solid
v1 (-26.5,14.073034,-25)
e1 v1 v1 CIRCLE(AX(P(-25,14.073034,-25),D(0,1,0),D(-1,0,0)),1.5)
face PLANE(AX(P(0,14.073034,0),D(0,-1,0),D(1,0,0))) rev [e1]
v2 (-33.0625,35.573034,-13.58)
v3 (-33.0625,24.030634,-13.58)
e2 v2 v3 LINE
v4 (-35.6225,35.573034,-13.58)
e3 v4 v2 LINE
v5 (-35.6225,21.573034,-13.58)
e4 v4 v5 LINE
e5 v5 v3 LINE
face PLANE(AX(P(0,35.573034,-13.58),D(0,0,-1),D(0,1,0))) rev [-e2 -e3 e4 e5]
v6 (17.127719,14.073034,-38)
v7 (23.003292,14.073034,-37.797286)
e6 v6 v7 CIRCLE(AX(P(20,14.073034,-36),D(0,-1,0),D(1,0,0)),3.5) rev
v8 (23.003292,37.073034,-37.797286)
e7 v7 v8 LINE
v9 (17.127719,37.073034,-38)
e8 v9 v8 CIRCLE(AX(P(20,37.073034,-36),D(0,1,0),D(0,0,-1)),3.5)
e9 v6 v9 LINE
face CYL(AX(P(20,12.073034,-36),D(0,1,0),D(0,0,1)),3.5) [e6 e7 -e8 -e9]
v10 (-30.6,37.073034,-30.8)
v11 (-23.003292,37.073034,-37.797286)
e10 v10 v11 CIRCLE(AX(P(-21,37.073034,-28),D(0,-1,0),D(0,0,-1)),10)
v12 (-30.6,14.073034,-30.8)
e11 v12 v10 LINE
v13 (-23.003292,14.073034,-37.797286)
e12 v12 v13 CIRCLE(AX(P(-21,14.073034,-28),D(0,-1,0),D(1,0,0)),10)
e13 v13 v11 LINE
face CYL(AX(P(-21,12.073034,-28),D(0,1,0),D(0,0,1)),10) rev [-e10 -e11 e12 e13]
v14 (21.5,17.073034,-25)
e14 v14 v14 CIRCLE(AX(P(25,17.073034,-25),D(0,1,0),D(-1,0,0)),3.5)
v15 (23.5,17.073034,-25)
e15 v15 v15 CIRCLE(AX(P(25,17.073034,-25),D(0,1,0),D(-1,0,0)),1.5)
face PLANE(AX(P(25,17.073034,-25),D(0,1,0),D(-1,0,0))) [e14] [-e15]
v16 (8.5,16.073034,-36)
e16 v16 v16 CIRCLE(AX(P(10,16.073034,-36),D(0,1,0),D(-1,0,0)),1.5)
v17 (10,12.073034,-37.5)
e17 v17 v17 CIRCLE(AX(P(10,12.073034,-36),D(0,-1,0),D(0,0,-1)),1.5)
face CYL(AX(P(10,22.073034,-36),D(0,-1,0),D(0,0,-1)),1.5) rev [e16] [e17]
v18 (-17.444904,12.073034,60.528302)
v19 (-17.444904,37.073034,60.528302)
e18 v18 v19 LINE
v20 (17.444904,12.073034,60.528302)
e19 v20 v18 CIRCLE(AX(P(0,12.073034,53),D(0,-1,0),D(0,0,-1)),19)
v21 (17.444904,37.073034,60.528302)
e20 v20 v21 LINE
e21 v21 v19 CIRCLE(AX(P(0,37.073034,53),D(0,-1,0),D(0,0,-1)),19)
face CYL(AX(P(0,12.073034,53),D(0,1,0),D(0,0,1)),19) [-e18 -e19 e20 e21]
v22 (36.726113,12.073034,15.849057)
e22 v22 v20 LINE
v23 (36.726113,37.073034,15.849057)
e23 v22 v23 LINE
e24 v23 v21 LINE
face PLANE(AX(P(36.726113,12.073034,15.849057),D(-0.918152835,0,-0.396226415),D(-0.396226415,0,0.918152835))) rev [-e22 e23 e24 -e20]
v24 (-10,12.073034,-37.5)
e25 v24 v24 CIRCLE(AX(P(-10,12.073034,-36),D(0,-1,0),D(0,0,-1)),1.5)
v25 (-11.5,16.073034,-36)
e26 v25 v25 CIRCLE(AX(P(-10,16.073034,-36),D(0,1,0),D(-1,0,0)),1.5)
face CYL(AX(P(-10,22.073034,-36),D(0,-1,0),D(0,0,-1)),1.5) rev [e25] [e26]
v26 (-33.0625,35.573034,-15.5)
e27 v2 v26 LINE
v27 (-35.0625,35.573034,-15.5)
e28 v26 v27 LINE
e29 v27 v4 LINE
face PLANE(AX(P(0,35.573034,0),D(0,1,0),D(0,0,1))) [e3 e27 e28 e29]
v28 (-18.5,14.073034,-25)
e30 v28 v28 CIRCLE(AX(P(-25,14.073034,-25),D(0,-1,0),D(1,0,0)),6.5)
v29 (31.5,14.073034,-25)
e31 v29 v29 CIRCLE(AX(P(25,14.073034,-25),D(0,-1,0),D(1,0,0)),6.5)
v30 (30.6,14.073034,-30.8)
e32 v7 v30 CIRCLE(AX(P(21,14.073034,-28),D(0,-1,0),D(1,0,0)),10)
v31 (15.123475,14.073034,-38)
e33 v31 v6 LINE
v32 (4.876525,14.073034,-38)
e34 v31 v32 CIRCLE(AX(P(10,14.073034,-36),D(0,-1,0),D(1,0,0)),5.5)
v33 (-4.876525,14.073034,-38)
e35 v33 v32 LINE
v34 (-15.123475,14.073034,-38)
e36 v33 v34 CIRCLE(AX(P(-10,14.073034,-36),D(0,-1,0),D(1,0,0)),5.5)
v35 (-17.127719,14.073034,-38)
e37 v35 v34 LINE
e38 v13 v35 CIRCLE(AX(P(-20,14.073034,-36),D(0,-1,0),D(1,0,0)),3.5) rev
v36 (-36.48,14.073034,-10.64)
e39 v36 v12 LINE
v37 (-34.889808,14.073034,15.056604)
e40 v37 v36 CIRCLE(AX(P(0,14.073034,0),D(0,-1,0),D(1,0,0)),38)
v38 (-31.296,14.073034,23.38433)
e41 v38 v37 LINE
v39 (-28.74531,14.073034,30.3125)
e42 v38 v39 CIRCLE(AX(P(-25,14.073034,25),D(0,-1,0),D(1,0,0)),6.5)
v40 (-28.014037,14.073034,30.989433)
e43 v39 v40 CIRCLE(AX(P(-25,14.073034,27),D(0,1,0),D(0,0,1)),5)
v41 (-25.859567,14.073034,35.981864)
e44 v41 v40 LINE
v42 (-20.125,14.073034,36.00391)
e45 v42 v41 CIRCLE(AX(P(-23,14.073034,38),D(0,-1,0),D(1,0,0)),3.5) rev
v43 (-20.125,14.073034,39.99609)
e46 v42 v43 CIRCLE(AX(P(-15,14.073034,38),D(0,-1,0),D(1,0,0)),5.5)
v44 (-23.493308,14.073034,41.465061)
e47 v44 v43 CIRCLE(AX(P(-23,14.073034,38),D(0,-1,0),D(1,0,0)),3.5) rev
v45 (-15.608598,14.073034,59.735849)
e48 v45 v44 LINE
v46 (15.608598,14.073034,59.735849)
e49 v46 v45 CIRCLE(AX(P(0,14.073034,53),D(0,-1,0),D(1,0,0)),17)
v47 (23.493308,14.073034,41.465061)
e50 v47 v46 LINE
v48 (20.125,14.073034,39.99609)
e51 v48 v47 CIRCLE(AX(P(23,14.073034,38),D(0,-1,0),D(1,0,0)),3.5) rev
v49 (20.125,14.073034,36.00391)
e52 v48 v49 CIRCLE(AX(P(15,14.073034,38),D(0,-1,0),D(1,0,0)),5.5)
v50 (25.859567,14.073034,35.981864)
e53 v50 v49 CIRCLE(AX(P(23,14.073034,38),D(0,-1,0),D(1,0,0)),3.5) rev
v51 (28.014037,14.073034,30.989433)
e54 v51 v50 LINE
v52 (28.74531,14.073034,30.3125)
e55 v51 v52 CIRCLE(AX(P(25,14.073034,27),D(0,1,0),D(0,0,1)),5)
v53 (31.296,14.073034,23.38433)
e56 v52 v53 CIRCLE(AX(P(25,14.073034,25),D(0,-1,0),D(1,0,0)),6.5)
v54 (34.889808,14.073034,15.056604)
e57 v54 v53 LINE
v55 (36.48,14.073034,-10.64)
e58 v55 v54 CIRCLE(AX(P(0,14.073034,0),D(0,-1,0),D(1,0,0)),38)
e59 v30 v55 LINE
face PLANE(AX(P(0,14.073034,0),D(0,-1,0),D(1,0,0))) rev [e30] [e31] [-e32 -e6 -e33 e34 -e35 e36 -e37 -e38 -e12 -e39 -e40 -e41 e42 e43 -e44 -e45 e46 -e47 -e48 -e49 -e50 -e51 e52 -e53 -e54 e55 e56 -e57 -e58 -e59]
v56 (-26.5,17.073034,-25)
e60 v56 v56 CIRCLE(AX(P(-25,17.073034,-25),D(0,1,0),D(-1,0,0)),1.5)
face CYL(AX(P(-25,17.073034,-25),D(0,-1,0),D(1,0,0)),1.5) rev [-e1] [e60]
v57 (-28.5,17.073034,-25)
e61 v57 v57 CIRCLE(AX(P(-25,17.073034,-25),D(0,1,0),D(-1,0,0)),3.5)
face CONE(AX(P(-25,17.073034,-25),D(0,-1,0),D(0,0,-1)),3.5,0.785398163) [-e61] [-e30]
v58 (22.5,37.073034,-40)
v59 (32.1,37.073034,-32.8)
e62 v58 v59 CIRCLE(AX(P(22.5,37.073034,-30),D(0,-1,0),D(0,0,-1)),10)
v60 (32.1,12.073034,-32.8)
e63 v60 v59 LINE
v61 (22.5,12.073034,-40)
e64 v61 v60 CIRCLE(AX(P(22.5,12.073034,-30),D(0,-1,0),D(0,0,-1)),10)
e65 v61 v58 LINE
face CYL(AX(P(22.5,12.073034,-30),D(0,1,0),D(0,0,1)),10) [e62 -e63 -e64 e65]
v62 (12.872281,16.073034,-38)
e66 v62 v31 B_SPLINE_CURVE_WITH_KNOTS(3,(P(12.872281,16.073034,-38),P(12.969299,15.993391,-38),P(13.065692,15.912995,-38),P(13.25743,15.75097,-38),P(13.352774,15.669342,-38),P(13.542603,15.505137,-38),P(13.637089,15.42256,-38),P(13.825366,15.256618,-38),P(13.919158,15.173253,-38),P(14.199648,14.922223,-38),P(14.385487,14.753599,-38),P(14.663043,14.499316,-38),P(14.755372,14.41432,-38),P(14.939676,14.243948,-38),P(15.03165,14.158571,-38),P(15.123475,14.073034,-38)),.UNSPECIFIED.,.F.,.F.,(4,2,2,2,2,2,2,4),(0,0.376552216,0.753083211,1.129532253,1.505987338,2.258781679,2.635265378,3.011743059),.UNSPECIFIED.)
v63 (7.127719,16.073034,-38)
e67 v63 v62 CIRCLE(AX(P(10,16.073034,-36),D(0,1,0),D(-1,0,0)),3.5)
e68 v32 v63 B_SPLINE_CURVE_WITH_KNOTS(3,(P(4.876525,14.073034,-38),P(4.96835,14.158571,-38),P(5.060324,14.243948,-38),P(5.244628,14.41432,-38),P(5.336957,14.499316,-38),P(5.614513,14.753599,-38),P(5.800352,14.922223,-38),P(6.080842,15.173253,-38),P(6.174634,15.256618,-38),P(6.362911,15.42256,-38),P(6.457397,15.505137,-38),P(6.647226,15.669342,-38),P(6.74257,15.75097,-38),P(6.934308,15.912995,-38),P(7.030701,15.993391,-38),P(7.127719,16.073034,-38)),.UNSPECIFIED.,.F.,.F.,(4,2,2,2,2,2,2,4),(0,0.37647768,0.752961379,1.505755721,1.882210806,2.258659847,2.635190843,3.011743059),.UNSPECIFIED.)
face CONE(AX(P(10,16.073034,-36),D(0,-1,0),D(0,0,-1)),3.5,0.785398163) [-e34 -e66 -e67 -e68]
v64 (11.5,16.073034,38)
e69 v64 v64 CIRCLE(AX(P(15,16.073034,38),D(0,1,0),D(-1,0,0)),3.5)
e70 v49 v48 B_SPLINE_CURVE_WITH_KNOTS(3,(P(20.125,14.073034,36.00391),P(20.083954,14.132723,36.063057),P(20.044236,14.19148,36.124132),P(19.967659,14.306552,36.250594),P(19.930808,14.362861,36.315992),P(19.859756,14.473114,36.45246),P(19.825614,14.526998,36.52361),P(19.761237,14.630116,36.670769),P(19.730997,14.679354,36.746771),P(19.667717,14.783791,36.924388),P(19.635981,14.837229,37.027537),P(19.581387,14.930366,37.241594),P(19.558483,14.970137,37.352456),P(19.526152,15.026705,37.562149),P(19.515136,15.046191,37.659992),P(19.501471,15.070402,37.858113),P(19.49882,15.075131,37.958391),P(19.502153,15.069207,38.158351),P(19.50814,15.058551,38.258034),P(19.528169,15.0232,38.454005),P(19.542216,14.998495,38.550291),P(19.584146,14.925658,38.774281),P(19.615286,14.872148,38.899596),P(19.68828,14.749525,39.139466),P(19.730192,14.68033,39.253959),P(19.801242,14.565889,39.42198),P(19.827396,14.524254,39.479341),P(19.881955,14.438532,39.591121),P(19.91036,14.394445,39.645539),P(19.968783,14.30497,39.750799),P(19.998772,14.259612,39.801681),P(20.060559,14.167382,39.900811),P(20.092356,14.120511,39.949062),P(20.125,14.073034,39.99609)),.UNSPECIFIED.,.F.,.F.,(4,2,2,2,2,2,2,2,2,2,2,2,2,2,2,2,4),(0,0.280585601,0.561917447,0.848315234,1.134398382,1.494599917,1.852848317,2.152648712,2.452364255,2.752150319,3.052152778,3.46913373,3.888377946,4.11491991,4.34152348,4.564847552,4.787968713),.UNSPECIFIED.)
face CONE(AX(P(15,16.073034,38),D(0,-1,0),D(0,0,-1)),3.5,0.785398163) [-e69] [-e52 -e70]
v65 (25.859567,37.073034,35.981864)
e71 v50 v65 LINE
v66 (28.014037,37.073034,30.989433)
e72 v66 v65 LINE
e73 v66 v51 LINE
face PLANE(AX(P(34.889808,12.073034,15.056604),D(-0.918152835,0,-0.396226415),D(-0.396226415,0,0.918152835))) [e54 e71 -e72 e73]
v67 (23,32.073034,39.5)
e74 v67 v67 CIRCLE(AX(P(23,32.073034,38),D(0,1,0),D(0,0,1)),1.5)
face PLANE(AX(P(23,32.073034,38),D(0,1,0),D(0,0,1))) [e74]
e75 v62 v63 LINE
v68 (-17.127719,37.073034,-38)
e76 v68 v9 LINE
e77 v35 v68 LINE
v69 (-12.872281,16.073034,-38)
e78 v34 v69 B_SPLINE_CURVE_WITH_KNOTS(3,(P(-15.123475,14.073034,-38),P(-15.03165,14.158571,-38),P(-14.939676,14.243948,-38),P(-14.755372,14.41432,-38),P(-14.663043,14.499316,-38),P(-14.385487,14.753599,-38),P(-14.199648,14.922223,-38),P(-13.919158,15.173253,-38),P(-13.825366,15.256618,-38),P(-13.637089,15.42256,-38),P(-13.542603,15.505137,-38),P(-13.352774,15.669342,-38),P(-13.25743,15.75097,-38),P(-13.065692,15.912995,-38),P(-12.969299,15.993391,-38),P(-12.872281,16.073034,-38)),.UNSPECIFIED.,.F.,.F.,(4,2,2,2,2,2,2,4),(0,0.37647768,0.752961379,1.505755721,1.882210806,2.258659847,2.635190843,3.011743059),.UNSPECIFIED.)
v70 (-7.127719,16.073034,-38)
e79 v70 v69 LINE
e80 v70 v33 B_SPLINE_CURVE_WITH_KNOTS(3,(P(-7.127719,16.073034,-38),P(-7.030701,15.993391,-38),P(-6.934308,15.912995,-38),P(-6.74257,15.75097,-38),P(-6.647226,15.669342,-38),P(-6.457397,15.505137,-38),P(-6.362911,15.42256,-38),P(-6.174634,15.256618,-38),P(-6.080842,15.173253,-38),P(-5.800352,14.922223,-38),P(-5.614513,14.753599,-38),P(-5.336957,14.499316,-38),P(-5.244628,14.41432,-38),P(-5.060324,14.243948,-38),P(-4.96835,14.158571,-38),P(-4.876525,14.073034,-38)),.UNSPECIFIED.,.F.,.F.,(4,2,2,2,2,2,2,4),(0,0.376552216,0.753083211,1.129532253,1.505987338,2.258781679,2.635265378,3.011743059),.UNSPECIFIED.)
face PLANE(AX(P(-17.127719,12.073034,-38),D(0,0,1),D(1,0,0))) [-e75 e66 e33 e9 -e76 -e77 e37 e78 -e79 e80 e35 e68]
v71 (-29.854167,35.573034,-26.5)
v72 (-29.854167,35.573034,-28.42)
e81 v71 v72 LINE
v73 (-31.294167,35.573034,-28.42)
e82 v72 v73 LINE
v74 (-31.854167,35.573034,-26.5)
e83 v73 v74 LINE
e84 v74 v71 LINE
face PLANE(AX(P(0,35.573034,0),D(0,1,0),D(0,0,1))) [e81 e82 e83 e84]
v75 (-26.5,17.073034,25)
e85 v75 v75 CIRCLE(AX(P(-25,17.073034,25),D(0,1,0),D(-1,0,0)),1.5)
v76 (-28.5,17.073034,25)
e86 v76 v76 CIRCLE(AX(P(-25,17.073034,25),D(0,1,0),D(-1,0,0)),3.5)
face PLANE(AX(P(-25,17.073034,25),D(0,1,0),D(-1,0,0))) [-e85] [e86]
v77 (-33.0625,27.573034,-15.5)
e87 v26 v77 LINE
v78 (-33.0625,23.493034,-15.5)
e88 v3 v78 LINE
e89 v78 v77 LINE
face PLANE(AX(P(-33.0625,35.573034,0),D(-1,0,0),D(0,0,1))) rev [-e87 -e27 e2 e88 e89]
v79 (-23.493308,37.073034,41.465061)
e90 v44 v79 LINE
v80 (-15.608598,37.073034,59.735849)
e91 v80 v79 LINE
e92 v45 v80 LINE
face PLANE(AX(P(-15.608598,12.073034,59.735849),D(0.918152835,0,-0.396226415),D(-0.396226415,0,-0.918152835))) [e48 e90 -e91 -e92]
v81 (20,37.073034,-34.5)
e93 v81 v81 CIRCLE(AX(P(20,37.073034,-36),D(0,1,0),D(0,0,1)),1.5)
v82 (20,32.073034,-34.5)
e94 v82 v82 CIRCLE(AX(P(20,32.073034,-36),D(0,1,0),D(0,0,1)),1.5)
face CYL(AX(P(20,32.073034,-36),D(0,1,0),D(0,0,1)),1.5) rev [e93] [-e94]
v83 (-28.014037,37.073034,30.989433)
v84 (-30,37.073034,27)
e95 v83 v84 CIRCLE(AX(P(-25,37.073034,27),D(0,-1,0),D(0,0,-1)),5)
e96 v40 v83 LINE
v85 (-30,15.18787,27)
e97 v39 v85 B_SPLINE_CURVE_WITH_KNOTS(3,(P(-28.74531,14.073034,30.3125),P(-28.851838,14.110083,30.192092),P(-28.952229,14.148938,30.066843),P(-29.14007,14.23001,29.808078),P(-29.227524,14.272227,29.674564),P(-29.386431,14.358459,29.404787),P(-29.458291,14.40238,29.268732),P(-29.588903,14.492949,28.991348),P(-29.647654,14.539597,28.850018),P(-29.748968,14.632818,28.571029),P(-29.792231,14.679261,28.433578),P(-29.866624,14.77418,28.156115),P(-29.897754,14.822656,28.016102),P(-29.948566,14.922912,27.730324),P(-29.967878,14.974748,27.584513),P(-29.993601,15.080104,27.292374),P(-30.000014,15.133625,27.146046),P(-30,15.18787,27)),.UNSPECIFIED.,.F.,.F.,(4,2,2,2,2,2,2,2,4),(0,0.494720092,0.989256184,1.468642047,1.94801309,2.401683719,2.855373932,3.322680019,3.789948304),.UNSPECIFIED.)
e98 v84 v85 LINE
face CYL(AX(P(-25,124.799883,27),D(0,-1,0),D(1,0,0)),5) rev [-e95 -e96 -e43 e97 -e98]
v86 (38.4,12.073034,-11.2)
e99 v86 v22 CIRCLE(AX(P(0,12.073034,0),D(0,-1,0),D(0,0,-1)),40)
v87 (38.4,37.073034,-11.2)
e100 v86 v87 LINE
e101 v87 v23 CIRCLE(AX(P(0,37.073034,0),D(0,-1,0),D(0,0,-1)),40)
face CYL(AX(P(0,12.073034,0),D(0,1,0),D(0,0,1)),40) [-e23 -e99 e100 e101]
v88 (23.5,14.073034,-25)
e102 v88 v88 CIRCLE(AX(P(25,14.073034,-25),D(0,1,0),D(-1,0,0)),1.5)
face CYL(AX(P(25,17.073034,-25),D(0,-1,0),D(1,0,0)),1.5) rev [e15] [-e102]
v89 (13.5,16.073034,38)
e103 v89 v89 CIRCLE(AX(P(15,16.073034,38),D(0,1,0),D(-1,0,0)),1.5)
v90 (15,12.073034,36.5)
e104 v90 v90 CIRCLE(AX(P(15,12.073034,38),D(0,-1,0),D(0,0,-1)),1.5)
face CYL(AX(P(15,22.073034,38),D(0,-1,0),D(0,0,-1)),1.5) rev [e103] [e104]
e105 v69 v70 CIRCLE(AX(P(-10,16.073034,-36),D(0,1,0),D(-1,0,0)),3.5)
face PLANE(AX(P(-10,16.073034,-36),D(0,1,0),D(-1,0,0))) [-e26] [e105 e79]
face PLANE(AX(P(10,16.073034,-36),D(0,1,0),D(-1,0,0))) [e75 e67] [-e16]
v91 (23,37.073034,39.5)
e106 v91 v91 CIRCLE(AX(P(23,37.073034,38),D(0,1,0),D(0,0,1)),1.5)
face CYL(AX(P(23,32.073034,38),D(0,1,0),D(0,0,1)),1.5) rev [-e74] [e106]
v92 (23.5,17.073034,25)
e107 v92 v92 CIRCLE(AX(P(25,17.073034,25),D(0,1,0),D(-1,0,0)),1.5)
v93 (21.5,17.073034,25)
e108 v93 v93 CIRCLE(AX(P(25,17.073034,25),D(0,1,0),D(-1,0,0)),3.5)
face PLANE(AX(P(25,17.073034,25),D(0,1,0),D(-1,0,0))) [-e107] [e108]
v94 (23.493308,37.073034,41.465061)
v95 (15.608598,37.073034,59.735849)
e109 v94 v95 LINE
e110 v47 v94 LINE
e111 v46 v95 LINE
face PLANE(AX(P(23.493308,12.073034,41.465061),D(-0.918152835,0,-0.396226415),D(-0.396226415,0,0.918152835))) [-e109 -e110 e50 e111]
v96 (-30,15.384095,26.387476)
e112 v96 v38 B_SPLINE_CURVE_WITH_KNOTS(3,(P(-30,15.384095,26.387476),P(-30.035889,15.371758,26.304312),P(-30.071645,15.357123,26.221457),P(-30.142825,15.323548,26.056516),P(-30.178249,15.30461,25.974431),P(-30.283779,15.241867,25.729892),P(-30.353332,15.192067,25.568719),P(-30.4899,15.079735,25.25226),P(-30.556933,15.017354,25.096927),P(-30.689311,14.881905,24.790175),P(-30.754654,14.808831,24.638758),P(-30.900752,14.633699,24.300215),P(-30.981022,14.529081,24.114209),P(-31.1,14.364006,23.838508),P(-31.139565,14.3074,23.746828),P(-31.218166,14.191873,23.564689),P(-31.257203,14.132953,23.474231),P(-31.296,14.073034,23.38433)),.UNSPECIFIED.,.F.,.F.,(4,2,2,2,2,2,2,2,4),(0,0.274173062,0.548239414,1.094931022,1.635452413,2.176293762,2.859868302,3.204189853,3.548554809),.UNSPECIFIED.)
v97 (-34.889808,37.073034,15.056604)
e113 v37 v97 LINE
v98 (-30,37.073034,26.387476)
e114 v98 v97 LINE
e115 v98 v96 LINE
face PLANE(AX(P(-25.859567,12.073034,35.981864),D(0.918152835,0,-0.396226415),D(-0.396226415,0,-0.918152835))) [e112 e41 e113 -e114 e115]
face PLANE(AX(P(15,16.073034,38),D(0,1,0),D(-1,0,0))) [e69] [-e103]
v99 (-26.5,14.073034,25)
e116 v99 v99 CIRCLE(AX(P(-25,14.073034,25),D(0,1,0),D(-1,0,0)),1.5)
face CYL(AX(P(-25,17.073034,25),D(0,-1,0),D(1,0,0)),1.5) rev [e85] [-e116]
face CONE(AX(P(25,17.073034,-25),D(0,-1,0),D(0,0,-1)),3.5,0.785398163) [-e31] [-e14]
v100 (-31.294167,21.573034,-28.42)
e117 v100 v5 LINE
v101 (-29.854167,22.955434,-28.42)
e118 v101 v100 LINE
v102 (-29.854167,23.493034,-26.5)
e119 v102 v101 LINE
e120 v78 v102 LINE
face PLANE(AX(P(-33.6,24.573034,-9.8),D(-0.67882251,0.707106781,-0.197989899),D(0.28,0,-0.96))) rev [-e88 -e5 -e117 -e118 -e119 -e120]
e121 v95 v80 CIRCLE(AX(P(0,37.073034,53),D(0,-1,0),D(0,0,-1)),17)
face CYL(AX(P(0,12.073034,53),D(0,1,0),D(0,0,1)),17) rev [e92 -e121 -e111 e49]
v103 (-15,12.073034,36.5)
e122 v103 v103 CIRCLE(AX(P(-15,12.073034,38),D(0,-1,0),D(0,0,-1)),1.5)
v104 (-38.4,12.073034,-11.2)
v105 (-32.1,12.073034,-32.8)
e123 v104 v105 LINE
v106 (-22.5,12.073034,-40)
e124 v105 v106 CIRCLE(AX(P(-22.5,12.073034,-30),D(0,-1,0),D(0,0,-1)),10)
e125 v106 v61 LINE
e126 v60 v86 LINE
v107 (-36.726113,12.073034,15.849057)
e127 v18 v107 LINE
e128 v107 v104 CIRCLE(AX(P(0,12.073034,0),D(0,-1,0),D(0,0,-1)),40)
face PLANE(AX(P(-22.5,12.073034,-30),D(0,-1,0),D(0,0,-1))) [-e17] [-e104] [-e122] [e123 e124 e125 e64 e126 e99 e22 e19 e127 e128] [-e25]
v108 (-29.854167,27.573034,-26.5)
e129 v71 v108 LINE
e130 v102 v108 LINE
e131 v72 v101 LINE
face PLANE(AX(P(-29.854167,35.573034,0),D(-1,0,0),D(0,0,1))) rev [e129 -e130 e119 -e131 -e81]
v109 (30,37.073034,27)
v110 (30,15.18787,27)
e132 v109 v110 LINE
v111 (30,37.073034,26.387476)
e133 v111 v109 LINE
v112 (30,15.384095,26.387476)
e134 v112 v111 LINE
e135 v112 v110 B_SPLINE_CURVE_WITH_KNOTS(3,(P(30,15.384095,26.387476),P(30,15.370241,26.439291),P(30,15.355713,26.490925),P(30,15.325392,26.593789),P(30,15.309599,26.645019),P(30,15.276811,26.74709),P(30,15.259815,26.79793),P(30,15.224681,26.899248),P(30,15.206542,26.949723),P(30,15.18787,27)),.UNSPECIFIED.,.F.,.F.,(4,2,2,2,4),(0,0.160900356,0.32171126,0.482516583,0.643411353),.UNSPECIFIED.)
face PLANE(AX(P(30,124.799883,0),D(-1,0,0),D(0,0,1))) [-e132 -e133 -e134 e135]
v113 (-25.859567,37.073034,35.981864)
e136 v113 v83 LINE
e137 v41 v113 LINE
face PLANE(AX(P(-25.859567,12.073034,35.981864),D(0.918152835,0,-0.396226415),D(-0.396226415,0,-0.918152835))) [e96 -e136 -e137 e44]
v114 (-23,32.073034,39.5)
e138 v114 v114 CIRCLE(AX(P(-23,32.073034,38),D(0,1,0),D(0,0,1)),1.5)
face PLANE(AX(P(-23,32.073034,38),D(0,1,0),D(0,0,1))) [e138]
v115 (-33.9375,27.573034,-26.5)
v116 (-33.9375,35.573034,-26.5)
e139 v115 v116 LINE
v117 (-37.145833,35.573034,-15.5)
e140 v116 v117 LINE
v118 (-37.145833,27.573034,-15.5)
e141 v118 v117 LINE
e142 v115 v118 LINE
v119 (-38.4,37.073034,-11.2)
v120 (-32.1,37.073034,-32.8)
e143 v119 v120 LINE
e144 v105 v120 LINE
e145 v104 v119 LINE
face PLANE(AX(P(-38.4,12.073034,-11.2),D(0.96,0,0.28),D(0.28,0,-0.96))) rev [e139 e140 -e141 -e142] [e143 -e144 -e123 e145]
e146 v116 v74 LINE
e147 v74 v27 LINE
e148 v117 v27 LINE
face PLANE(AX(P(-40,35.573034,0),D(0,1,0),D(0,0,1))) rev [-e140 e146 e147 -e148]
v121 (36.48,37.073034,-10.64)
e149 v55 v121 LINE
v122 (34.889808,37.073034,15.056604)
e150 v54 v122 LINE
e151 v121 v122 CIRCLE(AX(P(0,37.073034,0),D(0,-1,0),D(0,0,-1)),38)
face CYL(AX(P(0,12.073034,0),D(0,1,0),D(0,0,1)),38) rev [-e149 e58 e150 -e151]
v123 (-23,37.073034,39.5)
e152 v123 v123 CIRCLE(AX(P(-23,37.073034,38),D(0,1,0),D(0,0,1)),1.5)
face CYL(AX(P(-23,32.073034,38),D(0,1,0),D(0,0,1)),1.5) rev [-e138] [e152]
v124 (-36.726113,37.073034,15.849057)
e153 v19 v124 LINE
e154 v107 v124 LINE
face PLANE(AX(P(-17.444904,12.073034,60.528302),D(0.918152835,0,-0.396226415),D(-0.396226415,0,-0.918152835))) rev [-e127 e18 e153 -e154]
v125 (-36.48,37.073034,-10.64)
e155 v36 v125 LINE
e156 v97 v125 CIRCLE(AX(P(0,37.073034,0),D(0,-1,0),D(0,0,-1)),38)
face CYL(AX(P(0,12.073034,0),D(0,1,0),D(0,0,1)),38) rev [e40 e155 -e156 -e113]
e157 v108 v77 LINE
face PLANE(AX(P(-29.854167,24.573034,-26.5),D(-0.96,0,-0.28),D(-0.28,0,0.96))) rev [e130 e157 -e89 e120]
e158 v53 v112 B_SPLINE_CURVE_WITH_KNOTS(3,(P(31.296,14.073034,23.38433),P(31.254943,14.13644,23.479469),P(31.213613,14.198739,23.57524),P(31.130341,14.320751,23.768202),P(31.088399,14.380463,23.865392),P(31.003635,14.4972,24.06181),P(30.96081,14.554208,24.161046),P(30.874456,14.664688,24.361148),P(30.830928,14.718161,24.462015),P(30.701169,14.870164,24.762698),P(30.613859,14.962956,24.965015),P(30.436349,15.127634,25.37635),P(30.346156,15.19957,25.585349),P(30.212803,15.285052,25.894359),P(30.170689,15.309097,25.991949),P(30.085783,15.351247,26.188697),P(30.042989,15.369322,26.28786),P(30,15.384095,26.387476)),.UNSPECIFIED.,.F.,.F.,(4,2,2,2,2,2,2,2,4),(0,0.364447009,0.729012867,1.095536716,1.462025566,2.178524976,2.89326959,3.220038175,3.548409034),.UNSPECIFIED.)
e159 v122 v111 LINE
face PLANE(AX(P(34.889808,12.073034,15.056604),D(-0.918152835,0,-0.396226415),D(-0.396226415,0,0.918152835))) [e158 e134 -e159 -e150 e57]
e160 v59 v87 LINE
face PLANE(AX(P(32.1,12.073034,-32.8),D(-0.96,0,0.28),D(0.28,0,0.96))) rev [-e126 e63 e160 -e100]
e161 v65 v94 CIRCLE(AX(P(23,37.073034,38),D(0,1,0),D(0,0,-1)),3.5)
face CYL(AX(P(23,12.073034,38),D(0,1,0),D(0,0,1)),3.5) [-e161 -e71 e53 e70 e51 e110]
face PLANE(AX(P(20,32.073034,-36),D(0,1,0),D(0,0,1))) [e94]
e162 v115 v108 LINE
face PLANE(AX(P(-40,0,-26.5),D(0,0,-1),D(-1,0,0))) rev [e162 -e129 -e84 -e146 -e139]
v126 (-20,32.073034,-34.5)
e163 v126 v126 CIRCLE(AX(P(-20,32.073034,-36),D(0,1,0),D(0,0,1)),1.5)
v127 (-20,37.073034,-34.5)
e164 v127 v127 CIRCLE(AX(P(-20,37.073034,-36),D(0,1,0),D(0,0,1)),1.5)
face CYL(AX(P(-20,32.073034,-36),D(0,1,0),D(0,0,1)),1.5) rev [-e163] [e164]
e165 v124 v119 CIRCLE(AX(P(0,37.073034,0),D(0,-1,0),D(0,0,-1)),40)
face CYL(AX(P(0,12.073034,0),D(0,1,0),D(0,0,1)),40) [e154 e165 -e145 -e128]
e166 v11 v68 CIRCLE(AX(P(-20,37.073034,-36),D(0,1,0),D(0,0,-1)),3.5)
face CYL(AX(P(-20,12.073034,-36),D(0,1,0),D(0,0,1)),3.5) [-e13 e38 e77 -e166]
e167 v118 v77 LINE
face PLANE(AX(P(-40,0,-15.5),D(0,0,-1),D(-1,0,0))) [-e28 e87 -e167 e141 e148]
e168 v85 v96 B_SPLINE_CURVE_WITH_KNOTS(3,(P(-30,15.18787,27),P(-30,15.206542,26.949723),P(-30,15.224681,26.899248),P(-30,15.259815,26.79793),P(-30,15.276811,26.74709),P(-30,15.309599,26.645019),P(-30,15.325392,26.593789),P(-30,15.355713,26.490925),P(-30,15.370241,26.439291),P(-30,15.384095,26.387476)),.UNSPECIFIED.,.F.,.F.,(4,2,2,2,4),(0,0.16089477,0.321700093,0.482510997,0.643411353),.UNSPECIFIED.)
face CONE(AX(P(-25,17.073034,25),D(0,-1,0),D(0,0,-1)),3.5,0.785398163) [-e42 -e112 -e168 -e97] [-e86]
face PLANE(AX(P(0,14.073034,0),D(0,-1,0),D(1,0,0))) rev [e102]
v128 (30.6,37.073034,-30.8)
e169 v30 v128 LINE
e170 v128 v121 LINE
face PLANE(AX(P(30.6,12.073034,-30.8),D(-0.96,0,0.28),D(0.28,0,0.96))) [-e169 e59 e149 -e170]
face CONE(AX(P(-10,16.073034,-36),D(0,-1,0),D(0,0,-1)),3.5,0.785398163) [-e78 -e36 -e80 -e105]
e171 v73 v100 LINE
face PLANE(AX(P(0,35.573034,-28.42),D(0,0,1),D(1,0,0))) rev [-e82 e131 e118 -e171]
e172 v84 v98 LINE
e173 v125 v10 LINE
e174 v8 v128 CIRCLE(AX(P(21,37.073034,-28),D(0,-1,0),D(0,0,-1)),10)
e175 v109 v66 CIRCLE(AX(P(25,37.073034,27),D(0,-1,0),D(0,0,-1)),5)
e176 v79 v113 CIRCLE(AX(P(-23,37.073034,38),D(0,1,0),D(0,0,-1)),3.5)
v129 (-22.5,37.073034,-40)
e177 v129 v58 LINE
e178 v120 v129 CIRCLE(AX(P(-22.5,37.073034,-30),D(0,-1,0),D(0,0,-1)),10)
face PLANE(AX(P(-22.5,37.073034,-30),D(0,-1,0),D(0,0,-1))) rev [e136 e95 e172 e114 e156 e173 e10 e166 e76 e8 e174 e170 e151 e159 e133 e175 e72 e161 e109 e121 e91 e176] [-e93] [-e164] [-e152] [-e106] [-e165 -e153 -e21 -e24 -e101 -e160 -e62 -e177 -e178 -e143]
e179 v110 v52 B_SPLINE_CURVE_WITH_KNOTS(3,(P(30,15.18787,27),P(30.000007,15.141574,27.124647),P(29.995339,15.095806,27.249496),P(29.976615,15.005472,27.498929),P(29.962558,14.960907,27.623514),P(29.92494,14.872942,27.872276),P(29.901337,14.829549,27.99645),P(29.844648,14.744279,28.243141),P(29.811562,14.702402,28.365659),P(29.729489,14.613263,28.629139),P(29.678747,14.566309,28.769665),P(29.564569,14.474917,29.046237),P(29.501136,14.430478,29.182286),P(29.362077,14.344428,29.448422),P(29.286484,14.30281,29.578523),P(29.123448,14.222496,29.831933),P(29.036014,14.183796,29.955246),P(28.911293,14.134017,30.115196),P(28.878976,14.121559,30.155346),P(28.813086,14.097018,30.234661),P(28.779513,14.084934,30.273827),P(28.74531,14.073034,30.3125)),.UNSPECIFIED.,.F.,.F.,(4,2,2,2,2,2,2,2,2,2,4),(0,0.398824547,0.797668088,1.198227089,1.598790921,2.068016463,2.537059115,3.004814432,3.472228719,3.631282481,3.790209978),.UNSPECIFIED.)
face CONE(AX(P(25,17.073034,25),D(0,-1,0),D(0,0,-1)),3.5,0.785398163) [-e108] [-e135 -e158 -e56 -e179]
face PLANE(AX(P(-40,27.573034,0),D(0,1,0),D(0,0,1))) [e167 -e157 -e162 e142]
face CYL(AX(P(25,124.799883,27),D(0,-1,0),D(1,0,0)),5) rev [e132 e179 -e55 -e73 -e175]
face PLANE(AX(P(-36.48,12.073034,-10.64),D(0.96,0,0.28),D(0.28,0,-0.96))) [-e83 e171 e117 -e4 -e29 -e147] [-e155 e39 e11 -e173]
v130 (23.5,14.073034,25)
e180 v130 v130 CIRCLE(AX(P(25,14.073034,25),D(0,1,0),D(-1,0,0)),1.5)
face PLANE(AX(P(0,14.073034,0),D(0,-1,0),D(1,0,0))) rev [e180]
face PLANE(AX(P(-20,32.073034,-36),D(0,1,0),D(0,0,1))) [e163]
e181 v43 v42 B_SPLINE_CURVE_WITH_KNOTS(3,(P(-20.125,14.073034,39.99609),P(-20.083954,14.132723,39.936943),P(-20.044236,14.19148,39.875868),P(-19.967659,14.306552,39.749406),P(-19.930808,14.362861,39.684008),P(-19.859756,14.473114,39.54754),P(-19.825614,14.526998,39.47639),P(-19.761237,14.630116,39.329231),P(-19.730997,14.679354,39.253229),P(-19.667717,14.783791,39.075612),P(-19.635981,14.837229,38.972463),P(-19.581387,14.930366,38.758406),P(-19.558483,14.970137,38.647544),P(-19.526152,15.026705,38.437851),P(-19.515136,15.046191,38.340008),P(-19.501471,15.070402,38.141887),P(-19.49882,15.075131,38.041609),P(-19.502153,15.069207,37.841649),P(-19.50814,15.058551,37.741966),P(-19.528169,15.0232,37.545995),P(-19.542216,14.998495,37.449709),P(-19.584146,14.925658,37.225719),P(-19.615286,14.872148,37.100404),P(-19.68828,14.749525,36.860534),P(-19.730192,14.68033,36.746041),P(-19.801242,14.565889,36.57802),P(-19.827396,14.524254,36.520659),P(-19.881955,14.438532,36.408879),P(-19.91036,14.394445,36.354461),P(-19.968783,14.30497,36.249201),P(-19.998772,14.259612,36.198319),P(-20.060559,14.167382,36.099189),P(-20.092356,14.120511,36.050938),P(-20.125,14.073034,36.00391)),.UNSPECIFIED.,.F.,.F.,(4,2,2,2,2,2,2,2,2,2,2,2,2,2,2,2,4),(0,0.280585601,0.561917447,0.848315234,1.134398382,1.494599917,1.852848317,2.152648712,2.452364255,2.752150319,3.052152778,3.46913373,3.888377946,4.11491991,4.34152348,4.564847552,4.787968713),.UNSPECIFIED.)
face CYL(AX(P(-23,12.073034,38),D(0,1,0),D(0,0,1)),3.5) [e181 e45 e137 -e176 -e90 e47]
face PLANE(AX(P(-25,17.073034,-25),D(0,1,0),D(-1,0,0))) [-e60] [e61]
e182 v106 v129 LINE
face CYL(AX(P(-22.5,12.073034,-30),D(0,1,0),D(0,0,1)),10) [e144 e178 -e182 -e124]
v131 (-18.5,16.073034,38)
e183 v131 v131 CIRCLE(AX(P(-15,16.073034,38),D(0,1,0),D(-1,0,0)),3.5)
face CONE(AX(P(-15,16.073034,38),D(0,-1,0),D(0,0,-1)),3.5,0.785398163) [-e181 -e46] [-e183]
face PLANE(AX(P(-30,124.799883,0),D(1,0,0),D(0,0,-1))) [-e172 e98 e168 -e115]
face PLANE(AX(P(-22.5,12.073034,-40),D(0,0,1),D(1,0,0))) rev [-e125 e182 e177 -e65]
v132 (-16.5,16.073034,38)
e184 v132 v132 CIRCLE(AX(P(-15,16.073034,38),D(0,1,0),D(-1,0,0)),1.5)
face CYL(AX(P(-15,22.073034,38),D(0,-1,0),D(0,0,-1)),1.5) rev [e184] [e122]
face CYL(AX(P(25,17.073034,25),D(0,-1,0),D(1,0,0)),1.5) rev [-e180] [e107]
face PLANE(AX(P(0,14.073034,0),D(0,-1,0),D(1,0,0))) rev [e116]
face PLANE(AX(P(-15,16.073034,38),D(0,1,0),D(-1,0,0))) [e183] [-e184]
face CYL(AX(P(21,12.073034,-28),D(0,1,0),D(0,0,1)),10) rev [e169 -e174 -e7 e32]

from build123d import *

# Parameters (mm, degrees)
BOSS_EXTRUDE1_DEPTH = 25
BOSS_EXTRUDE2_START = -2
BOSS_EXTRUDE2_DEPTH = 2
SKETCH3_R           = 3.5
SKETCH3_R_2         = 1.5
BOSS_EXTRUDE3_DEPTH = 3
SKETCH4_R           = 3.5
CUT_EXTRUDE1_DEPTH  = 23
SKETCH6_R           = 1.5
CUT_EXTRUDE3_DEPTH  = 5
SKETCH7_W           = 11
SKETCH7_H           = 8
SKETCH7_W_2         = 8
SKETCH7_H_2         = 5
CUT_EXTRUDE4_DEPTH  = 91.323916408
BOSS_EXTRUDE5_DEPTH = 8
BOSS_EXTRUDE6_DEPTH = 3
CHAMFER1_SIZE       = 3
SKETCH11_R          = 1.5
CUT_EXTRUDE5_DEPTH  = 10
SKETCH12_R          = 3.5
SKETCH12_R_2        = 1.5
BOSS_EXTRUDE7_DEPTH = 2
CHAMFER2_SIZE       = 2
CHAMFER3_SIZE       = 3


with BuildPart() as part:
    # Sketch1 → Boss-Extrude1 (new body)
    with BuildSketch(Plane.XZ.offset(-37.073034342)):
        with BuildLine():
            Line((-22.5, -40), (22.5, -40))
            ThreePointArc((22.5, -40), (28.5, -38), (32.1, -32.8))
            Line((32.1, -32.8), (38.4, -11.2))
            ThreePointArc((38.4, -11.2), (39.923628268, 2.470608411), (36.72611339, 15.849056604))
            Line((36.72611339, 15.849056604), (17.44490386, 60.528301887))
            ThreePointArc((17.44490386, 60.528301887), (0, 72), (-17.44490386, 60.528301887))
            Line((-17.44490386, 60.528301887), (-36.72611339, 15.849056604))
            ThreePointArc((-36.72611339, 15.849056604), (-39.923628268, 2.470608411), (-38.4, -11.2))
            Line((-38.4, -11.2), (-32.1, -32.8))
            ThreePointArc((-32.1, -32.8), (-28.5, -38), (-22.5, -40))
        make_face()
        with BuildLine():
            Line((-17.127718677, -38), (17.127718677, -38))
            ThreePointArc((17.127718677, -38), (19.879318075, -32.502081208), (23.003291752, -37.797286469))
            ThreePointArc((23.003291752, -37.797286469), (27.774924306, -35.355297455), (30.6, -30.8))
            Line((30.6, -30.8), (36.48, -10.64))
            ThreePointArc((36.48, -10.64), (37.927446855, 2.347077991), (34.889807721, 15.056603774))
            Line((34.889807721, 15.056603774), (25.859567427, 35.981863698))
            ThreePointArc((25.859567427, 35.981863698), (19.786465078, 36.613207547), (23.493308255, 41.465060889))
            Line((23.493308255, 41.465060889), (15.608598191, 59.735849057))
            ThreePointArc((15.608598191, 59.735849057), (0, 70), (-15.608598191, 59.735849057))
            Line((-15.608598191, 59.735849057), (-23.493308255, 41.465060889))
            ThreePointArc((-23.493308255, 41.465060889), (-19.786465078, 36.613207547), (-25.859567427, 35.981863698))
            Line((-25.859567427, 35.981863698), (-34.889807721, 15.056603774))
            ThreePointArc((-34.889807721, 15.056603774), (-37.927446855, 2.347077991), (-36.48, -10.64))
            Line((-36.48, -10.64), (-30.6, -30.8))
            ThreePointArc((-30.6, -30.8), (-27.774924306, -35.355297455), (-23.003291752, -37.797286469))
            ThreePointArc((-23.003291752, -37.797286469), (-19.879318075, -32.502081208), (-17.127718677, -38))
        make_face(mode=Mode.SUBTRACT)
    extrude(amount=BOSS_EXTRUDE1_DEPTH)

    # Sketch2 → Boss-Extrude2 (add)
    with BuildSketch(Plane.XZ.offset(-12.073034342).offset(BOSS_EXTRUDE2_START)):
        with BuildLine():
            Line((-38.4, -11.2), (-32.1, -32.8))
            ThreePointArc((-32.1, -32.8), (-28.5, -38), (-22.5, -40))
            Line((-22.5, -40), (22.5, -40))
            ThreePointArc((22.5, -40), (28.5, -38), (32.1, -32.8))
            Line((32.1, -32.8), (38.4, -11.2))
            ThreePointArc((38.4, -11.2), (39.923628268, 2.470608411), (36.72611339, 15.849056604))
            Line((36.72611339, 15.849056604), (17.44490386, 60.528301887))
            ThreePointArc((17.44490386, 60.528301887), (0, 72), (-17.44490386, 60.528301887))
            Line((-17.44490386, 60.528301887), (-36.72611339, 15.849056604))
            ThreePointArc((-36.72611339, 15.849056604), (-39.923628268, 2.470608411), (-38.4, -11.2))
        make_face()
    extrude(amount=BOSS_EXTRUDE2_DEPTH)

    # Sketch3 → Boss-Extrude3 (add)
    # profile 1 of 4: a face of its own
    with BuildSketch(Plane(origin=(0, 14.073034342, 0), x_dir=(1, 0, 0), z_dir=(0, 1, 0))):
        with Locations((25, -25)):
            Circle(SKETCH3_R)
        with Locations(Location((25, -25, 0), (0, 0, 180))):
            Circle(SKETCH3_R_2, mode=Mode.SUBTRACT)
    # profile 2 of 4: a face of its own
    with BuildSketch(Plane(origin=(0, 14.073034342, 0), x_dir=(1, 0, 0), z_dir=(0, 1, 0))):
        with Locations((25, 25)):
            Circle(SKETCH3_R)
        with Locations(Location((25, 25, 0), (0, 0, 180))):
            Circle(SKETCH3_R_2, mode=Mode.SUBTRACT)
    # profile 3 of 4: a face of its own
    with BuildSketch(Plane(origin=(0, 14.073034342, 0), x_dir=(1, 0, 0), z_dir=(0, 1, 0))):
        with Locations((-25, 25)):
            Circle(SKETCH3_R)
        with Locations(Location((-25, 25, 0), (0, 0, 180))):
            Circle(SKETCH3_R_2, mode=Mode.SUBTRACT)
    # profile 4 of 4: a face of its own
    with BuildSketch(Plane(origin=(0, 14.073034342, 0), x_dir=(1, 0, 0), z_dir=(0, 1, 0))):
        with Locations((-25, -25)):
            Circle(SKETCH3_R)
        with Locations(Location((-25, -25, 0), (0, 0, 180))):
            Circle(SKETCH3_R_2, mode=Mode.SUBTRACT)
    extrude(amount=BOSS_EXTRUDE3_DEPTH)

    # Sketch4 → Cut-Extrude1 (cut)
    # profile 1 of 2: a face of its own
    with BuildSketch(Plane(origin=(0, 14.073034342, 0), x_dir=(1, 0, 0), z_dir=(0, 1, 0))):
        with BuildLine():
            Line((30, -26.387475844), (28.014037499, -30.989433288))
            ThreePointArc((28.014037499, -30.989433288), (29.476057836, -29.228206959), (30, -27))
            Line((30, -27), (30, -26.387475844))
        make_face()
    # profile 2 of 2: a face of its own
    with BuildSketch(Plane(origin=(0, 14.073034342, 0), x_dir=(1, 0, 0), z_dir=(0, 1, 0))):
        with BuildLine():
            ThreePointArc((-30, -27), (-28.535533906, -30.535533906), (-25, -32))
            Line((-25, -32), (25, -32))
            ThreePointArc((25, -32), (26.589470598, -31.740631099), (28.014037499, -30.989433288))
            Line((28.014037499, -30.989433288), (30, -26.387475844))
            Line((30, -26.387475844), (30, 27))
            ThreePointArc((30, 27), (28.535533906, 30.535533906), (25, 32))
            Line((25, 32), (-25, 32))
            ThreePointArc((-25, 32), (-28.535533906, 30.535533906), (-30, 27))
            Line((-30, 27), (-30, -27))
        make_face()
        with Locations((-25, -25)):
            Circle(SKETCH4_R, mode=Mode.SUBTRACT)
        with Locations((25, -25)):
            Circle(SKETCH4_R, mode=Mode.SUBTRACT)
        with Locations((-25, 25)):
            Circle(SKETCH4_R, mode=Mode.SUBTRACT)
        with Locations((25, 25)):
            Circle(SKETCH4_R, mode=Mode.SUBTRACT)
    extrude(amount=CUT_EXTRUDE1_DEPTH, mode=Mode.SUBTRACT)

    # Sketch6 → Cut-Extrude3 (cut)
    with BuildSketch(Plane(origin=(0, 37.073034342, 0), x_dir=(1, 0, 0), z_dir=(0, 1, 0))):
        with Locations(Location((-20, 36, 0), (0, 0, 270))):
            Circle(SKETCH6_R)
        with Locations(Location((20, 36, 0), (0, 0, 270))):
            Circle(SKETCH6_R)
        with Locations(Location((23, -38, 0), (0, 0, 270))):
            Circle(SKETCH6_R)
        with Locations(Location((-23, -38, 0), (0, 0, 270))):
            Circle(SKETCH6_R)
    extrude(amount=-CUT_EXTRUDE3_DEPTH, mode=Mode.SUBTRACT)

    # Sketch7 → Cut-Extrude4 (cut, through all)
    # profile 1 of 2: a face of its own
    with BuildSketch(Plane(origin=(0, 0, 0), x_dir=(0, 0, -1), z_dir=(1, 0, 0))):
        with Locations((21, 31.573034342)):
            Rectangle(SKETCH7_W, SKETCH7_H)
        with Locations((21, 31.573034342)):
            Rectangle(SKETCH7_W_2, SKETCH7_H_2, mode=Mode.SUBTRACT)
    # profile 2 of 2: a face of its own
    with BuildSketch(Plane(origin=(0, 0, 0), x_dir=(0, 0, -1), z_dir=(1, 0, 0))):
        with Locations((21, 31.573034342)):
            Rectangle(SKETCH7_W_2, SKETCH7_H_2)
    extrude(amount=-CUT_EXTRUDE4_DEPTH, mode=Mode.SUBTRACT)

    # Sketch9 → Boss-Extrude5 (add)
    with BuildSketch(Plane(origin=(0, 27.573034342, 0), x_dir=(1, 0, 0), z_dir=(0, 1, 0))):
        Polygon((-33.0625, 13.58), (-33.0625, 15.5), (-35.0625, 15.5), (-35.6225, 13.58), align=None)
        Polygon((-29.854166667, 28.42), (-31.294166667, 28.42), (-31.854166667, 26.5), (-29.854166667, 26.5), align=None)
    extrude(amount=BOSS_EXTRUDE5_DEPTH)

    # Sketch10 → Boss-Extrude6 (add)
    with BuildSketch(Plane.XZ.offset(-27.573034342)):
        Polygon((-35.6225, -13.58), (-31.294166667, -28.42), (-29.854166667, -28.42), (-29.854166667, -26.5), (-33.0625, -15.5), (-33.0625, -13.58), align=None)
    extrude(amount=BOSS_EXTRUDE6_DEPTH)

    # Chamfer1
    # the kernel refuses this chamfer: 3 mm, written as the material it adds along each edge
    with BuildSketch(Plane(origin=(-37.78271371, 24.573034342, -6.173552995), x_dir=(0.9596370402348446, 0.02749587661058677, 0.2798941367351632), z_dir=(0.2800000000000002, 0, -0.96))) as chamfer1_piece_1_section:
        Polygon((CHAMFER1_SIZE * 0.999621916911, CHAMFER1_SIZE * 0.0274958766106), (-CHAMFER1_SIZE * 0.0274958766106, CHAMFER1_SIZE * 0.999621916911), (0, 0), align=None)
    chamfer1_piece_1 = extrude(amount=30.888431261, mode=Mode.PRIVATE)
    chamfer1_piece_1 = split(chamfer1_piece_1, bisect_by=Plane(origin=(-33.0625, 24.155030607, -14.247780946), z_dir=(-1, 0, 0)), keep=Keep.TOP, mode=Mode.PRIVATE)
    chamfer1_piece_1 = split(chamfer1_piece_1, bisect_by=Plane(origin=(-33.414366406, 24.155030607, -14.293600894), z_dir=(0.9599999999999999, 0, 0.2800000000000006)), keep=Keep.TOP, mode=Mode.PRIVATE)
    chamfer1_piece_1 = split(chamfer1_piece_1, bisect_by=Plane(origin=(-33.257269443, 24.155030607, -13.58), z_dir=(0, 0, -1)), keep=Keep.TOP, mode=Mode.PRIVATE)
    add(chamfer1_piece_1)
    with BuildSketch(Plane(origin=(-37.78271371, 24.573034342, -6.173552995), x_dir=(0.9596370402348446, 0.02749587661058677, 0.2798941367351632), z_dir=(0.2800000000000002, 0, -0.96))) as chamfer1_piece_2_section:
        Polygon((CHAMFER1_SIZE * 0.999621916911, CHAMFER1_SIZE * 0.0274958766106), (-CHAMFER1_SIZE * 0.0274958766106, CHAMFER1_SIZE * 0.999621916911), (0, 0), align=None)
    chamfer1_piece_2 = extrude(amount=30.888431261, mode=Mode.PRIVATE)
    chamfer1_piece_2 = split(chamfer1_piece_2, bisect_by=Plane(origin=(-33.0625, 23.368164353, -16.922113673), z_dir=(-1, 0, 0)), keep=Keep.TOP, mode=Mode.PRIVATE)
    chamfer1_piece_2 = split(chamfer1_piece_2, bisect_by=Plane(origin=(-32.756658844, 23.368164353, -16.548598249), z_dir=(-0.9599999999999999, 0, -0.2800000000000006)), keep=Keep.TOP, mode=Mode.PRIVATE)
    chamfer1_piece_2 = split(chamfer1_piece_2, bisect_by=Plane(origin=(-34.037283155, 23.368164353, -13.58), z_dir=(0, 0, -1)), keep=Keep.TOP, mode=Mode.PRIVATE)
    add(chamfer1_piece_2)
    with BuildSketch(Plane(origin=(-37.78271371, 24.573034342, -6.173552995), x_dir=(0.9596370402348446, 0.02749587661058677, 0.2798941367351632), z_dir=(0.2800000000000002, 0, -0.96))) as chamfer1_piece_3_section:
        Polygon((CHAMFER1_SIZE * 0.999621916911, CHAMFER1_SIZE * 0.0274958766106), (-CHAMFER1_SIZE * 0.0274958766106, CHAMFER1_SIZE * 0.999621916911), (0, 0), align=None)
    chamfer1_piece_3 = extrude(amount=30.888431261, mode=Mode.PRIVATE)
    chamfer1_piece_3 = split(chamfer1_piece_3, bisect_by=Plane(origin=(-33.0625, 23.528567842, -23.718008697), z_dir=(1, 0, 0)), keep=Keep.TOP, mode=Mode.PRIVATE)
    chamfer1_piece_3 = split(chamfer1_piece_3, bisect_by=Plane(origin=(-31.750809391, 23.528567842, -28.42), z_dir=(0, 0, 1)), keep=Keep.TOP, mode=Mode.PRIVATE)
    chamfer1_piece_3 = split(chamfer1_piece_3, bisect_by=Plane(origin=(-29.854166667, 23.528567842, -23.718008697), z_dir=(-1, 0, 0)), keep=Keep.TOP, mode=Mode.PRIVATE)
    chamfer1_piece_3 = split(chamfer1_piece_3, bisect_by=Plane(origin=(-30.750662718, 23.528567842, -23.426299251), z_dir=(-0.9599999999999999, 0, -0.2800000000000006)), keep=Keep.TOP, mode=Mode.PRIVATE)
    add(chamfer1_piece_3)

    # Sketch11 → Cut-Extrude5 (cut)
    with BuildSketch(Plane.XZ.offset(-12.073034342)):
        with Locations(Location((10, -36, 0), (0, 0, 270))):
            Circle(SKETCH11_R)
        with Locations(Location((-10, -36, 0), (0, 0, 270))):
            Circle(SKETCH11_R)
        with Locations(Location((15, 38, 0), (0, 0, 270))):
            Circle(SKETCH11_R)
        with Locations(Location((-15, 38, 0), (0, 0, 270))):
            Circle(SKETCH11_R)
    extrude(amount=-CUT_EXTRUDE5_DEPTH, mode=Mode.SUBTRACT)

    # Sketch12 → Boss-Extrude7 (add)
    # profile 1 of 4: a face of its own
    with BuildSketch(Plane(origin=(0, 14.073034342, 0), x_dir=(1, 0, 0), z_dir=(0, 1, 0))):
        with Locations((-15, -38)):
            Circle(SKETCH12_R)
        with Locations(Location((-15, -38, 0), (0, 0, 90))):
            Circle(SKETCH12_R_2, mode=Mode.SUBTRACT)
    # profile 2 of 4: a face of its own
    with BuildSketch(Plane(origin=(0, 14.073034342, 0), x_dir=(1, 0, 0), z_dir=(0, 1, 0))):
        with Locations((15, -38)):
            Circle(SKETCH12_R)
        with Locations(Location((15, -38, 0), (0, 0, 90))):
            Circle(SKETCH12_R_2, mode=Mode.SUBTRACT)
    # profile 3 of 4: a face of its own
    with BuildSketch(Plane(origin=(0, 14.073034342, 0), x_dir=(1, 0, 0), z_dir=(0, 1, 0))):
        with Locations((10, 36)):
            Circle(SKETCH12_R)
        with Locations(Location((10, 36, 0), (0, 0, 90))):
            Circle(SKETCH12_R_2, mode=Mode.SUBTRACT)
    # profile 4 of 4: a face of its own
    with BuildSketch(Plane(origin=(0, 14.073034342, 0), x_dir=(1, 0, 0), z_dir=(0, 1, 0))):
        with Locations((-10, 36)):
            Circle(SKETCH12_R)
        with Locations(Location((-10, 36, 0), (0, 0, 90))):
            Circle(SKETCH12_R_2, mode=Mode.SUBTRACT)
    extrude(amount=BOSS_EXTRUDE7_DEPTH)

    # Chamfer2
    # the kernel refuses this chamfer: 2 mm, written as the material it adds along each edge
    with BuildSketch(Plane(origin=(-15, 14.073034342, 38), x_dir=(1, 0, 0), z_dir=(0, 0, 1))) as chamfer2_piece_1:
        Polygon((3.5 + CHAMFER2_SIZE, 0), (3.5, CHAMFER2_SIZE), (3.5, 0), align=None)
    revolve(axis=Axis((-15, 14.073034342, 38), (0, 1, 0)))
    with BuildSketch(Plane(origin=(15, 14.073034342, 38), x_dir=(1, 0, 0), z_dir=(0, 0, 1))) as chamfer2_piece_2:
        Polygon((3.5, CHAMFER2_SIZE), (3.5 + CHAMFER2_SIZE, 0), (3.5, 0), align=None)
    revolve(axis=Axis((15, 14.073034342, 38), (0, 1, 0)))
    with BuildSketch(Plane(origin=(10, 14.073034342, -36), x_dir=(0.003141587485879528, -1.0150610510858574e-15, -0.9999950652018582), z_dir=(-0.9999950652018582, 0, -0.003141587485879528))) as chamfer2_piece_3_section:
        Polygon((3.5 + CHAMFER2_SIZE, 0), (3.5, -CHAMFER2_SIZE), (3.5, 0), align=None)
    chamfer2_piece_3 = revolve(axis=Axis((10, 14.073034342, -36), (0, -1, 0)), revolution_arc=359.64, mode=Mode.PRIVATE)
    chamfer2_piece_3 = split(chamfer2_piece_3, bisect_by=Plane(origin=(10, 15.050005962, -40), z_dir=(0, 0, 1)), keep=Keep.TOP, mode=Mode.PRIVATE)
    add(chamfer2_piece_3)
    with BuildSketch(Plane(origin=(-10, 14.073034342, -36), x_dir=(0.0031415874858790205, -1.0150610510858574e-15, -0.9999950652018582), z_dir=(-0.9999950652018582, 0, -0.0031415874858790205))) as chamfer2_piece_4_section:
        Polygon((3.5 + CHAMFER2_SIZE, 0), (3.5, -CHAMFER2_SIZE), (3.5, 0), align=None)
    chamfer2_piece_4 = revolve(axis=Axis((-10, 14.073034342, -36), (0, -1, 0)), revolution_arc=359.64, mode=Mode.PRIVATE)
    chamfer2_piece_4 = split(chamfer2_piece_4, bisect_by=Plane(origin=(-10, 15.050005962, -40), z_dir=(0, 0, 1)), keep=Keep.TOP, mode=Mode.PRIVATE)
    add(chamfer2_piece_4)

    # Chamfer3
    # the kernel refuses this chamfer: 3 mm, written as the material it adds along each edge
    with BuildSketch(Plane(origin=(25, 14.073034342, 25), x_dir=(1, 0, 0), z_dir=(0, 0, 1))) as chamfer3_piece_1_section:
        Polygon((3.5 + CHAMFER3_SIZE, 0), (3.5, CHAMFER3_SIZE), (3.5, 0), align=None)
    chamfer3_piece_1 = revolve(axis=Axis((25, 14.073034342, 25), (0, 1, 0)), mode=Mode.PRIVATE)
    chamfer3_piece_1 = split(chamfer3_piece_1, bisect_by=Plane(origin=(19.994246695, 17.073034342, 25), z_dir=(0, -1, 0)), keep=Keep.TOP, mode=Mode.PRIVATE)
    add(chamfer3_piece_1)
    with BuildSketch(Plane(origin=(25, 14.073034342, -25), x_dir=(1, 0, 0), z_dir=(0, 0, 1))) as chamfer3_piece_2_section:
        Polygon((3.5 + CHAMFER3_SIZE, 0), (3.5, CHAMFER3_SIZE), (3.5, 0), align=None)
    chamfer3_piece_2 = revolve(axis=Axis((25, 14.073034342, -25), (0, 1, 0)), mode=Mode.PRIVATE)
    chamfer3_piece_2 = split(chamfer3_piece_2, bisect_by=Plane(origin=(19.994246691, 17.073034342, -25), z_dir=(0, -1, 0)), keep=Keep.TOP, mode=Mode.PRIVATE)
    add(chamfer3_piece_2)
    with BuildSketch(Plane(origin=(-25, 14.073034342, -25), x_dir=(1, 0, 0), z_dir=(0, 0, 1))) as chamfer3_piece_3_section:
        Polygon((3.5 + CHAMFER3_SIZE, 0), (3.5, CHAMFER3_SIZE), (3.5, 0), align=None)
    chamfer3_piece_3 = revolve(axis=Axis((-25, 14.073034342, -25), (0, 1, 0)), mode=Mode.PRIVATE)
    chamfer3_piece_3 = split(chamfer3_piece_3, bisect_by=Plane(origin=(-30.005753306, 17.073034342, -25), z_dir=(0, -1, 0)), keep=Keep.TOP, mode=Mode.PRIVATE)
    add(chamfer3_piece_3)
    with BuildSketch(Plane(origin=(-25, 14.073034342, 25), x_dir=(1, 0, 0), z_dir=(0, 0, 1))) as chamfer3_piece_4_section:
        Polygon((3.5 + CHAMFER3_SIZE, 0), (3.5, CHAMFER3_SIZE), (3.5, 0), align=None)
    chamfer3_piece_4 = revolve(axis=Axis((-25, 14.073034342, 25), (0, 1, 0)), mode=Mode.PRIVATE)
    chamfer3_piece_4 = split(chamfer3_piece_4, bisect_by=Plane(origin=(-30.00575331, 17.073034342, 25), z_dir=(0, -1, 0)), keep=Keep.TOP, mode=Mode.PRIVATE)
    add(chamfer3_piece_4)


solid = part.part
